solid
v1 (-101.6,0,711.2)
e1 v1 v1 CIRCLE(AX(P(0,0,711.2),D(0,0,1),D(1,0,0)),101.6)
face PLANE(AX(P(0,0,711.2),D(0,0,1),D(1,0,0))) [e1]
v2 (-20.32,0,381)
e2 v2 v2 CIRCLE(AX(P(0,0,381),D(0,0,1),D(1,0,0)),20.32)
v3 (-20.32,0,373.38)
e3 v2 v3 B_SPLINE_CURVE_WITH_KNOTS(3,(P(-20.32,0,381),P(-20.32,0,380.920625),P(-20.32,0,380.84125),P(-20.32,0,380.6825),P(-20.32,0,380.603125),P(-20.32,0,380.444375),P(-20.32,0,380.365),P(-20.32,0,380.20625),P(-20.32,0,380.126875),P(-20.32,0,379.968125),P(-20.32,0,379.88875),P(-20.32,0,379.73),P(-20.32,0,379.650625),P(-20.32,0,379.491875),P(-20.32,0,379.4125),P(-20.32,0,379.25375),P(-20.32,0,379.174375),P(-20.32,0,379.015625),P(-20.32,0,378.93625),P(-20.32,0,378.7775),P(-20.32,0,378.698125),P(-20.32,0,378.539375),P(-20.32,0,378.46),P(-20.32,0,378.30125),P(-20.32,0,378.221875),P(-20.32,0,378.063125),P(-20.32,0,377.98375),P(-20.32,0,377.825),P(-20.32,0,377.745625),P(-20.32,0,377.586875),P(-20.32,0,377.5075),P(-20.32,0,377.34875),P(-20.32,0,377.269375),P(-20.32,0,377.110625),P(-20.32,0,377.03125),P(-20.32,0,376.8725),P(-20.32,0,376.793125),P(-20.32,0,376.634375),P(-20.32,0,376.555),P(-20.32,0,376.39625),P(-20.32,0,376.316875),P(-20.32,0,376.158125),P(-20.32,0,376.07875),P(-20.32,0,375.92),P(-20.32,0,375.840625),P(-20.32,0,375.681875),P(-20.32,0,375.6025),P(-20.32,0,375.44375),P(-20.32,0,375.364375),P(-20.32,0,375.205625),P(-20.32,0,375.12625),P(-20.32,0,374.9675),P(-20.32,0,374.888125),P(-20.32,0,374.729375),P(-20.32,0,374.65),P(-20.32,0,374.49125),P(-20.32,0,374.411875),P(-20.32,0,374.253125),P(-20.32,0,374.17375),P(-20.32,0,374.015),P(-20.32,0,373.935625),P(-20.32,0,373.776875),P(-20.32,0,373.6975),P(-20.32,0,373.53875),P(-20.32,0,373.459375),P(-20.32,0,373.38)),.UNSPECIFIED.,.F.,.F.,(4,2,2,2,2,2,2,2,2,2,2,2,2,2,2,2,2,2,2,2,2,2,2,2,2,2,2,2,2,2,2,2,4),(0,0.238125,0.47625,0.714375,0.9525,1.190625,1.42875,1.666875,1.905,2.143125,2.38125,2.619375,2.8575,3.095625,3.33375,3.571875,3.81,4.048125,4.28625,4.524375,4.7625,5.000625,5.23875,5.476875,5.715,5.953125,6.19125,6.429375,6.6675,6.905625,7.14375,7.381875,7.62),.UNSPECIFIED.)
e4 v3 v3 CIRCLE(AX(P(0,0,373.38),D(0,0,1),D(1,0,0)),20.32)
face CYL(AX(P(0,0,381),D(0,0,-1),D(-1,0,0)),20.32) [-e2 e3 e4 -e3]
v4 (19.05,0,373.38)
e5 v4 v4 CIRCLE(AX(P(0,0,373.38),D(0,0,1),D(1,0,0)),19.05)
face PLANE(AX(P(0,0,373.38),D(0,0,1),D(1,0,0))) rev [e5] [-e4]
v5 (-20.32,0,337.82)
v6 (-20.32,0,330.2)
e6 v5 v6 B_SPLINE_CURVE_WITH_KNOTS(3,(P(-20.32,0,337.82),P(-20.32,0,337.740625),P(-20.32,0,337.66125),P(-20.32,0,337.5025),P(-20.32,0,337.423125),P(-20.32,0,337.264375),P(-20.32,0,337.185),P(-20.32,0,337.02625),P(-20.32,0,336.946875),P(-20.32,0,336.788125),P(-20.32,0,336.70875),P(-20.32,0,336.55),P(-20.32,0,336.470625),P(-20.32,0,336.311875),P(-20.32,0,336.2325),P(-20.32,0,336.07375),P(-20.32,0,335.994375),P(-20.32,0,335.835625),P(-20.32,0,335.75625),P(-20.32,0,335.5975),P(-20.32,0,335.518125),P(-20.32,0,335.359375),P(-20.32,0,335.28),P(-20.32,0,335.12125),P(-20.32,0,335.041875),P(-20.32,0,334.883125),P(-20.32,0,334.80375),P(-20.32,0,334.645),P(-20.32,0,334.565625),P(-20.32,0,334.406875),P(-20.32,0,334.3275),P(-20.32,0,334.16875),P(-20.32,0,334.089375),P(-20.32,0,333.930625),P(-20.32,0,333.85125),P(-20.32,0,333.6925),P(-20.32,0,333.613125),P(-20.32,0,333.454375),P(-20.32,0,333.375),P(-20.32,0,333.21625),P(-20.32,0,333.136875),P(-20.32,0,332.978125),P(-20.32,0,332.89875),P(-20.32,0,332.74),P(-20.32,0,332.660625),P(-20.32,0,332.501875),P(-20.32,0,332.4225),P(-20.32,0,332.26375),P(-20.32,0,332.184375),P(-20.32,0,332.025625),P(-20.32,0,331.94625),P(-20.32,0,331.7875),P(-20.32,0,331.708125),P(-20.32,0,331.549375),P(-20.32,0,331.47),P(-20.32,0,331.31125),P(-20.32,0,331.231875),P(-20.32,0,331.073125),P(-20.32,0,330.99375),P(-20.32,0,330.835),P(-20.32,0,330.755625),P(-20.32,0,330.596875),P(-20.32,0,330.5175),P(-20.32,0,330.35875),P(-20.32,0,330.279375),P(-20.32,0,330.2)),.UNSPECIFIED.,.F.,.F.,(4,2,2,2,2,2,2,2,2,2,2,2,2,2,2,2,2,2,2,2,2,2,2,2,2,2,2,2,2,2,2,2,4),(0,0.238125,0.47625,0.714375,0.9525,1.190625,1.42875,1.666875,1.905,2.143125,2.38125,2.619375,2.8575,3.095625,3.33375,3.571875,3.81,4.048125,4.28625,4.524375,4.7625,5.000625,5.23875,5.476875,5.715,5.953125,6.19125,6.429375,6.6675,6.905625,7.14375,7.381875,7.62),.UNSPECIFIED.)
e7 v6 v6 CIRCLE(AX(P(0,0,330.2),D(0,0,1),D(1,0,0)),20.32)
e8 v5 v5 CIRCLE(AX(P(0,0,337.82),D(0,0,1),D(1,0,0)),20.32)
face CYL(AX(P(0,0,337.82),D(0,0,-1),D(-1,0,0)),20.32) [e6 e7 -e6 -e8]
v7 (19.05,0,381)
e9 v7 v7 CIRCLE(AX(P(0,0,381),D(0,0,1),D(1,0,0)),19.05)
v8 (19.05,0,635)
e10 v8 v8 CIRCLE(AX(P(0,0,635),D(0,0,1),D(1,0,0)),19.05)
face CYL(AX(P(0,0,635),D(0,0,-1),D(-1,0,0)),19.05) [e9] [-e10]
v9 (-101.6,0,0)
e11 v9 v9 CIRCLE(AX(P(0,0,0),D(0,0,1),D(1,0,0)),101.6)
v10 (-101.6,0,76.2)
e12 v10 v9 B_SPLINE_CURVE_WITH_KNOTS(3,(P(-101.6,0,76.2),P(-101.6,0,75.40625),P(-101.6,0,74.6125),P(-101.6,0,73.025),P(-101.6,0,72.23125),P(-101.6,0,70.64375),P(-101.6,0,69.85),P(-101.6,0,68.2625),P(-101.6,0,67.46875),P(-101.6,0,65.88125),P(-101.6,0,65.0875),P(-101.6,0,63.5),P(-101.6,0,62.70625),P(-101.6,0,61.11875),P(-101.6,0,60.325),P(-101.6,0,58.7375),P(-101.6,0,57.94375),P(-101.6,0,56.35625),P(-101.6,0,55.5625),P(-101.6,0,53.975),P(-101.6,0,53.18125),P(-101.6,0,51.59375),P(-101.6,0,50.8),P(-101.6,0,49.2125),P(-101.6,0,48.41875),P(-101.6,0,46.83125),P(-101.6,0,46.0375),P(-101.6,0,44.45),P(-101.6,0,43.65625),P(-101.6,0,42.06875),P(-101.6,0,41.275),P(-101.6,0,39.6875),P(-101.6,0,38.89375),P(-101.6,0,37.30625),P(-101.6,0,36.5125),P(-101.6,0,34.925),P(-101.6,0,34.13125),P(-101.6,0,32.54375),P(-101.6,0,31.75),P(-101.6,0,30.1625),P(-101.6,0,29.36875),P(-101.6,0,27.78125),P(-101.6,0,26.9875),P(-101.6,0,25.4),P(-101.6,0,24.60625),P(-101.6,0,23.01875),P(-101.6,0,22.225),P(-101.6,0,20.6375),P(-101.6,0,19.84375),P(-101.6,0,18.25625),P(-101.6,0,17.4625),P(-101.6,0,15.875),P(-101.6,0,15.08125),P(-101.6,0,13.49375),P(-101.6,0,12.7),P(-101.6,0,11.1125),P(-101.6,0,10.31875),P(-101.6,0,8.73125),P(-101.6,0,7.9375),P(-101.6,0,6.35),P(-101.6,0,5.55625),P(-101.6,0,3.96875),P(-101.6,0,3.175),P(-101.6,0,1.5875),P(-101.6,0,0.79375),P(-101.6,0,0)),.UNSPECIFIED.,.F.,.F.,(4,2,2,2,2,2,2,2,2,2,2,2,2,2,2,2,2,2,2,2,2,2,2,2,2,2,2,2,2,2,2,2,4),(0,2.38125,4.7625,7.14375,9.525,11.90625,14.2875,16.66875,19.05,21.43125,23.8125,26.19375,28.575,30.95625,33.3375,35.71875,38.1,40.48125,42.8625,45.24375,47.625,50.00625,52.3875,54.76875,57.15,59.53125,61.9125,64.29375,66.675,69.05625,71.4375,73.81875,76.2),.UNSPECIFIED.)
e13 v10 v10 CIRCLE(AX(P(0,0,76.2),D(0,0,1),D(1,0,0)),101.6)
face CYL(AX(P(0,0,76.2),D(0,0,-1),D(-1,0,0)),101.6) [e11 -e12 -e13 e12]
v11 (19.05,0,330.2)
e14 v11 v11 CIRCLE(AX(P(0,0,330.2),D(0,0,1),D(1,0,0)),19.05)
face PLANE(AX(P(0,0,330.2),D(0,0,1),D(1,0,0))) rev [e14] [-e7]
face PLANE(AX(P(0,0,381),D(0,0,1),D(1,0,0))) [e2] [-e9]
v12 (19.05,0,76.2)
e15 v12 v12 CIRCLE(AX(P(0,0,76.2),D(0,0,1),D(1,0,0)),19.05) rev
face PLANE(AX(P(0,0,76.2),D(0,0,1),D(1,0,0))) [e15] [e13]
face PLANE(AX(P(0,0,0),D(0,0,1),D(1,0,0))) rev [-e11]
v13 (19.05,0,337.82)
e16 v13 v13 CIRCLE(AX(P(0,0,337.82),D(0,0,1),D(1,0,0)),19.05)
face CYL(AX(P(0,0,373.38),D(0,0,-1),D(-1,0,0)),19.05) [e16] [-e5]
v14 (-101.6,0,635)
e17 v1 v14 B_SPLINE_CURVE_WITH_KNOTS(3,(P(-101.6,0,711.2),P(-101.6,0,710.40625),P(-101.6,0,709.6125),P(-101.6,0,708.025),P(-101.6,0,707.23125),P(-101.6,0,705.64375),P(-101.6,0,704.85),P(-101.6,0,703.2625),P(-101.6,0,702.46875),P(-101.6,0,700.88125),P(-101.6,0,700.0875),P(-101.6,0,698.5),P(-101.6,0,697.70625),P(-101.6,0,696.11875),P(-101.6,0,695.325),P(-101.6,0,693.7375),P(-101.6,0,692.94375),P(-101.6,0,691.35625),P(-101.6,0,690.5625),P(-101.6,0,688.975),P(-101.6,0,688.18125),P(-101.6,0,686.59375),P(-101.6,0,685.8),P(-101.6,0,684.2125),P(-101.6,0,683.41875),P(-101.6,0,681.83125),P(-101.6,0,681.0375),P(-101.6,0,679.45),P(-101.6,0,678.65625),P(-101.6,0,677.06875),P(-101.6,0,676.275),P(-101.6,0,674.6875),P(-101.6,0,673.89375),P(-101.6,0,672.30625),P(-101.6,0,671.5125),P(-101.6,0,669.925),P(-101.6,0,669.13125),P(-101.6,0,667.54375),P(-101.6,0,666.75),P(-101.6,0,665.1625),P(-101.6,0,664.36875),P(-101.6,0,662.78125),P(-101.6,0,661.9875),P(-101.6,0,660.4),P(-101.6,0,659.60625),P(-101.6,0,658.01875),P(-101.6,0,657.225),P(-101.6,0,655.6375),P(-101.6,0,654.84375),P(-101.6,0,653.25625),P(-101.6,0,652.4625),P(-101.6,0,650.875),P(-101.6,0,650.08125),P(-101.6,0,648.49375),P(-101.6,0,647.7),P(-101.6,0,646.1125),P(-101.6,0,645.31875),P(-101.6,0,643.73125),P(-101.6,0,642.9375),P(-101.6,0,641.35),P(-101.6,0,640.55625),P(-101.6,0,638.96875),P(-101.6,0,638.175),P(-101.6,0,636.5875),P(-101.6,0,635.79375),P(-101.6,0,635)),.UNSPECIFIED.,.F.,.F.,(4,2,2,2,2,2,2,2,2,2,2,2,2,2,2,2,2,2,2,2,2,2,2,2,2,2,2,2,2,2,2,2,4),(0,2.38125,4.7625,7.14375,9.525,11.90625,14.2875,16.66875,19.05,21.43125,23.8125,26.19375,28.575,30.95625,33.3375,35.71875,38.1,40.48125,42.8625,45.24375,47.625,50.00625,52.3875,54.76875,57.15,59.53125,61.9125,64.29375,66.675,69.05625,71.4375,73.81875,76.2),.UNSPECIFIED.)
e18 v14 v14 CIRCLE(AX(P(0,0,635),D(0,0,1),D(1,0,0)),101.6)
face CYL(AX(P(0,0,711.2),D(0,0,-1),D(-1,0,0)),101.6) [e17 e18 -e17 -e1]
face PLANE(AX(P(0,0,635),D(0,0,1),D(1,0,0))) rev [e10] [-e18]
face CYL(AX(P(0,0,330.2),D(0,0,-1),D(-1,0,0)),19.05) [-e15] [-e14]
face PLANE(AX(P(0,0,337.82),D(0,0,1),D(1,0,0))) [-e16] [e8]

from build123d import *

# Parameters (mm, degrees)
SKETCH2_R               = 101.6
BOSS_EXTRUDE1_DEPTH     = 76.2
SKETCH3_R               = 19.05
BOSS_EXTRUDE2_DEPTH     = 330.2
SKETCH12_R              = 20.32
BOSS_EXTRUDE5_DEPTH     = 7.62
BOSS_EXTRUDE6_OUTLINE_R = 19.05
BOSS_EXTRUDE6_DEPTH     = 35.56
SKETCH14_R              = 20.32
BOSS_EXTRUDE7_DEPTH     = 7.62
BOSS_EXTRUDE8_OUTLINE_R = 19.05
BOSS_EXTRUDE8_DEPTH     = 254
SKETCH16_R              = 101.6
BOSS_EXTRUDE9_DEPTH     = 76.2


# Read off the part's stored shape, not the designer's step: Boss-Extrude6, Boss-Extrude8
with BuildPart() as part:
    # Sketch2 → Boss-Extrude1 (new body)
    with BuildSketch(Plane.XY):
        with Locations(Location((0, 0, 0), (0, 0, 180))):
            Circle(SKETCH2_R)
    extrude(amount=BOSS_EXTRUDE1_DEPTH)

    # Sketch3 → Boss-Extrude2 (add)
    with BuildSketch(Plane.XY):
        Circle(SKETCH3_R)
    extrude(amount=BOSS_EXTRUDE2_DEPTH)

    # Sketch12 → Boss-Extrude5 (add)
    with BuildSketch(Plane.XY.offset(330.2)):
        with Locations(Location((0, 0, 0), (0, 0, 180))):
            Circle(SKETCH12_R)
    extrude(amount=BOSS_EXTRUDE5_DEPTH)

    # Boss-Extrude6 outline → Boss-Extrude6 (add)
    with BuildSketch(Plane.XY.offset(337.82)):
        Circle(BOSS_EXTRUDE6_OUTLINE_R)
    extrude(amount=BOSS_EXTRUDE6_DEPTH)

    # Sketch14 → Boss-Extrude7 (add)
    with BuildSketch(Plane.XY.offset(373.38)):
        with Locations(Location((0, 0, 0), (0, 0, 180))):
            Circle(SKETCH14_R)
    extrude(amount=BOSS_EXTRUDE7_DEPTH)

    # Boss-Extrude8 outline → Boss-Extrude8 (add)
    with BuildSketch(Plane.XY.offset(381)):
        Circle(BOSS_EXTRUDE8_OUTLINE_R)
    extrude(amount=BOSS_EXTRUDE8_DEPTH)

    # Sketch16 → Boss-Extrude9 (add)
    with BuildSketch(Plane.XY.offset(635)):
        with Locations(Location((0, 0, 0), (0, 0, 180))):
            Circle(SKETCH16_R)
    extrude(amount=BOSS_EXTRUDE9_DEPTH)


solid = part.part
